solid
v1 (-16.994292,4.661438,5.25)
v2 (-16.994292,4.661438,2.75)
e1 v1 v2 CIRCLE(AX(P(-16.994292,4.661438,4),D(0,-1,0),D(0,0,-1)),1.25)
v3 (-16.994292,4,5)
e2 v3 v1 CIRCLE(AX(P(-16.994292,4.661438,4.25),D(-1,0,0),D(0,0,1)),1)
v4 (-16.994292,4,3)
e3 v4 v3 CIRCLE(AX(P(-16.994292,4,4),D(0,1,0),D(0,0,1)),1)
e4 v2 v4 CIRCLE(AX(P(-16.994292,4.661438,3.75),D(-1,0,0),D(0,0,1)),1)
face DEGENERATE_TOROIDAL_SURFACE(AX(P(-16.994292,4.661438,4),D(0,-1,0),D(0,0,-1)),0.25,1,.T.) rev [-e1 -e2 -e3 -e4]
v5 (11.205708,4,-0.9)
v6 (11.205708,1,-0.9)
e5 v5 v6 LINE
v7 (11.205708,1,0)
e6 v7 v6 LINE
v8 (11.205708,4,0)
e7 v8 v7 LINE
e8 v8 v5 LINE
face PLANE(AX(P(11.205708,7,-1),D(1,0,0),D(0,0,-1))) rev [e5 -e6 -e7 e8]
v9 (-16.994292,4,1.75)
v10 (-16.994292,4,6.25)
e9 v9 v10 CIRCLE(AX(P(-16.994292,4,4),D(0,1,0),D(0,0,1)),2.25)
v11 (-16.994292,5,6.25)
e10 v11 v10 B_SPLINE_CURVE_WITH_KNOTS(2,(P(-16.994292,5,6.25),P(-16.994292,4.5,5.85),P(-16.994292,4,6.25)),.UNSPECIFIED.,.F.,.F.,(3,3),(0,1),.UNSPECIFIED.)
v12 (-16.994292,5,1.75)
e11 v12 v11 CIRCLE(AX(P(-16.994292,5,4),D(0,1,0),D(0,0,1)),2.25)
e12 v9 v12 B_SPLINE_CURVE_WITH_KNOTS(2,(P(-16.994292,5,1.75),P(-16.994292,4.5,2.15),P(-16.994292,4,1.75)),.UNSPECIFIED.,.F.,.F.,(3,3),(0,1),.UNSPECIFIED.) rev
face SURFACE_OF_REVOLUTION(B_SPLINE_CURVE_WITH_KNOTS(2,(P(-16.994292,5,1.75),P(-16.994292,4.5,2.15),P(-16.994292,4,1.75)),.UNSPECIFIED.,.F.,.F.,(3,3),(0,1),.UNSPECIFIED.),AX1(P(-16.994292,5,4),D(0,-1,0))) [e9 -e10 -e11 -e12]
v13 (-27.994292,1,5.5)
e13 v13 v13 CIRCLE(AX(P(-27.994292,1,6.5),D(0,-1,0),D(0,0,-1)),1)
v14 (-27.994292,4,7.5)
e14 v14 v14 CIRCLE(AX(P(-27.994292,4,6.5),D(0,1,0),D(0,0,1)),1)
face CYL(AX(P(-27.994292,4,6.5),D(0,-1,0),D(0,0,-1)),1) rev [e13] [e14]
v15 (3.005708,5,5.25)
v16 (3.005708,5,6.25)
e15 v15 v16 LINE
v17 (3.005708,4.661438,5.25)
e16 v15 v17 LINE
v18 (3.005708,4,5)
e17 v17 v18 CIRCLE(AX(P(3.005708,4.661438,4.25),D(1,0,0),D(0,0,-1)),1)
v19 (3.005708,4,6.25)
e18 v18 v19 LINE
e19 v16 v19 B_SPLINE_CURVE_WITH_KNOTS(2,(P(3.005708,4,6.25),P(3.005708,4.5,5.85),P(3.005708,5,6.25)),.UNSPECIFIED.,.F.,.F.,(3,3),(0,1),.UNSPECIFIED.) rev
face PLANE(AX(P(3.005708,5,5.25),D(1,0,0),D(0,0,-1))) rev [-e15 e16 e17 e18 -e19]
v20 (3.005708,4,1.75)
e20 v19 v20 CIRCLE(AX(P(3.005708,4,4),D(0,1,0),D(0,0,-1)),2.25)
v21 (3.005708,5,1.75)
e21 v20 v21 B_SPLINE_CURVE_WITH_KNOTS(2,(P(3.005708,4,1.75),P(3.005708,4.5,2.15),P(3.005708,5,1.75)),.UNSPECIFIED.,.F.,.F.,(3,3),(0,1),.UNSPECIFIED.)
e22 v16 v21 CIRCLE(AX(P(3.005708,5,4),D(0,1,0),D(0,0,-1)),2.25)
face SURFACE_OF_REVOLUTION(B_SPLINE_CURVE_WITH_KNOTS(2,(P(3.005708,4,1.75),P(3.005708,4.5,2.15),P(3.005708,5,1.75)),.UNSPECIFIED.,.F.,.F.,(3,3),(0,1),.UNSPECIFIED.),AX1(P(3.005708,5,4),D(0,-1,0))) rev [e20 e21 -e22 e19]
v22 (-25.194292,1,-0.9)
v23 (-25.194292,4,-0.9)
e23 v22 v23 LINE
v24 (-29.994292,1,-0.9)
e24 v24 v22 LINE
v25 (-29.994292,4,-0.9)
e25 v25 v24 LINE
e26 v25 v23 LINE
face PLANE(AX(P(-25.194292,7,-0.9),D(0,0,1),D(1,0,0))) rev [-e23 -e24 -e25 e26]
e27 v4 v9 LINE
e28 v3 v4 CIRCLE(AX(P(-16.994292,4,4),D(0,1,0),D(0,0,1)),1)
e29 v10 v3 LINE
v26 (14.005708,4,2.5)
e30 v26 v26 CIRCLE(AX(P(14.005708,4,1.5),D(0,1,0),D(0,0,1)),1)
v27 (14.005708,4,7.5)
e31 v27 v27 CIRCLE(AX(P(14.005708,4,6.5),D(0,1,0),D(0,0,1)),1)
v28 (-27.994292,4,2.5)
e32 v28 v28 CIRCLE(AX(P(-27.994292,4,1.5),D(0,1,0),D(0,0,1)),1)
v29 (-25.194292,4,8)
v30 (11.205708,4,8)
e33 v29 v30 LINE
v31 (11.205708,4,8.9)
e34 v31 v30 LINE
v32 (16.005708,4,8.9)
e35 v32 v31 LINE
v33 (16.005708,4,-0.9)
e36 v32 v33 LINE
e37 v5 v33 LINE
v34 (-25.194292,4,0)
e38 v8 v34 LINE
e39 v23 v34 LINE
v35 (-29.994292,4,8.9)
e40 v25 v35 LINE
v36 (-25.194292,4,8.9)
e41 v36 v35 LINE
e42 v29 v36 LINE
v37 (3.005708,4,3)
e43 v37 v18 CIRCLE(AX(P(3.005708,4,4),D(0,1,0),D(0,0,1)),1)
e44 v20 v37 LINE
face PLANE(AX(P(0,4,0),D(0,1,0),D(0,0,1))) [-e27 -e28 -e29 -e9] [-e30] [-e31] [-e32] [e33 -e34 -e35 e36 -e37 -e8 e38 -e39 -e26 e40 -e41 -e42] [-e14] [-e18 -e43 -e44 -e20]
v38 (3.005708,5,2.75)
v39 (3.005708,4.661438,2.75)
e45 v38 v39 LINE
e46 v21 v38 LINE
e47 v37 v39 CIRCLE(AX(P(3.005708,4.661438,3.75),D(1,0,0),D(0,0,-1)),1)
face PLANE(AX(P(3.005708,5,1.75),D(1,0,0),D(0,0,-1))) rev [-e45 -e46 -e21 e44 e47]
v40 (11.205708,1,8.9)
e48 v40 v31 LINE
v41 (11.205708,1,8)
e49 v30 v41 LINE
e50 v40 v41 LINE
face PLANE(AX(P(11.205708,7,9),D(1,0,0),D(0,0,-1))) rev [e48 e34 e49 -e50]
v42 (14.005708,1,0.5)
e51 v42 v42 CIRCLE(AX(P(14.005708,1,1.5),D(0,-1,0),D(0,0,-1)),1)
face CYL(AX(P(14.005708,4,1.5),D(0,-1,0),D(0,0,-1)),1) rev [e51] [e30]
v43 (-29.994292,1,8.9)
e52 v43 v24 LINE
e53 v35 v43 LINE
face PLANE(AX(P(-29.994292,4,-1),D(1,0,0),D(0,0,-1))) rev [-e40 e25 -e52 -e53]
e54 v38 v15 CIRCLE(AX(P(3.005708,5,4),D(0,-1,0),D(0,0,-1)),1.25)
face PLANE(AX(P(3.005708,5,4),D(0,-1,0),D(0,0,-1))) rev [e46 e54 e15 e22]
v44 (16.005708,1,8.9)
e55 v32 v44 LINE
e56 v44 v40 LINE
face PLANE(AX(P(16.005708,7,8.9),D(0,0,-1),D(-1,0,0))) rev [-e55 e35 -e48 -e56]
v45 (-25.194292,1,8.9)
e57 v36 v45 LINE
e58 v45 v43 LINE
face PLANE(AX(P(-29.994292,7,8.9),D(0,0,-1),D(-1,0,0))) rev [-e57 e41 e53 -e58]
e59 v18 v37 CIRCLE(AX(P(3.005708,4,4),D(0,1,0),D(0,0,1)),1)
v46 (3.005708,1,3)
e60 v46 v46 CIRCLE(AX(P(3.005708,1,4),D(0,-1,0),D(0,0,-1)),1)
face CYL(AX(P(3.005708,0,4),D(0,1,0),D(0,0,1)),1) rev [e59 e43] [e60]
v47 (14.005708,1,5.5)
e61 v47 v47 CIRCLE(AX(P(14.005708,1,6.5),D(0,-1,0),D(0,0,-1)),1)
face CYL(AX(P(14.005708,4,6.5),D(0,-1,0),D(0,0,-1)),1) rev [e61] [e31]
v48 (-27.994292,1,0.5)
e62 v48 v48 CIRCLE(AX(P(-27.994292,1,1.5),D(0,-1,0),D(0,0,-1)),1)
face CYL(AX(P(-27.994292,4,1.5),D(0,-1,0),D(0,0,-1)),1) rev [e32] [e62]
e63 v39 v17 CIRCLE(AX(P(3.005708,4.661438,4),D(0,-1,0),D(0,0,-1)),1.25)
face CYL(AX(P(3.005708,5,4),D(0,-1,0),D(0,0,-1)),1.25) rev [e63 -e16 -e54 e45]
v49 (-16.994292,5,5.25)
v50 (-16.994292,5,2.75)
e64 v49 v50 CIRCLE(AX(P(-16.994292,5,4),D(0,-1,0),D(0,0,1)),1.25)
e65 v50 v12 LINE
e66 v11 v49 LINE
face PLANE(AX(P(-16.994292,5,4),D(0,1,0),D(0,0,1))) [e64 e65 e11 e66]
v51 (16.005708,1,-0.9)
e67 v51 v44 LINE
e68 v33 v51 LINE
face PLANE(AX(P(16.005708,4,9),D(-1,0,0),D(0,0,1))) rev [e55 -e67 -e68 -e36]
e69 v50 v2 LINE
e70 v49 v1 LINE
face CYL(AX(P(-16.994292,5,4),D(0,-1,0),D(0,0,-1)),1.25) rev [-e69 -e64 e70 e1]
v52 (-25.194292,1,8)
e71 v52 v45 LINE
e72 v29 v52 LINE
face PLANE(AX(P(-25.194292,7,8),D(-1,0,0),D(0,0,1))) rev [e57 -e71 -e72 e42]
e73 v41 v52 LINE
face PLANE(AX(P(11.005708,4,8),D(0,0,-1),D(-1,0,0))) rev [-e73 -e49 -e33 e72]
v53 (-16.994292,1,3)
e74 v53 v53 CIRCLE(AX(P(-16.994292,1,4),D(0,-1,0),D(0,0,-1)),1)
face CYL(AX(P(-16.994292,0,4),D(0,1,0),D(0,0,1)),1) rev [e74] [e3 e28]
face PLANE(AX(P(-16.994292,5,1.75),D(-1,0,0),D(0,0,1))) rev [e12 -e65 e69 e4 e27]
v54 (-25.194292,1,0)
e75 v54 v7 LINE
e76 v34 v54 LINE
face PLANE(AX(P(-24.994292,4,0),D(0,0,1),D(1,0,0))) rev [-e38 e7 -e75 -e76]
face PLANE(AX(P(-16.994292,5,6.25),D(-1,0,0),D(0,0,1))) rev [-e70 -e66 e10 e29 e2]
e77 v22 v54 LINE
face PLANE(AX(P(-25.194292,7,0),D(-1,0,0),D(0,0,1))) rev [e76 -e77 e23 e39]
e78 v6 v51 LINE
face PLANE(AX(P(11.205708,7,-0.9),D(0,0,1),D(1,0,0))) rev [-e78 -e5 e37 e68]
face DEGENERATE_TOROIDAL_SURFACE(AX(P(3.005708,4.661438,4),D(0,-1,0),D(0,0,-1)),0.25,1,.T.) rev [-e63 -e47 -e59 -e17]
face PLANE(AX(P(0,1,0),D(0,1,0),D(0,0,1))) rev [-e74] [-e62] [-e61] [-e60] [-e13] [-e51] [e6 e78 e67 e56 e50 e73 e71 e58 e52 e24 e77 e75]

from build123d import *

# Parameters (mm, degrees)
SKETCH_1_R          = 1
EXTRUDE_2_DEPTH     = 4
EXTRUDE_3_DEPTH     = 1
CUT_EXTRUDE_2_DEPTH = 1
SKETCH_10_R         = 25.399360379
CUT_EXTRUDE_3_DEPTH = 3
SKETCH_11_R         = 29.436090692
CUT_EXTRUDE_4_DEPTH = 10
EXTRUDE_4_DEPTH     = 1
SKETCH_17_W         = 0.2
SKETCH_17_H         = 1
CUT_EXTRUDE_6_DEPTH = 4
SKETCH_18_W         = 4.8
SKETCH_18_H         = 0.1
CUT_EXTRUDE_7_DEPTH = 4
SKETCH_19_R         = 1
CUT_EXTRUDE_8_DEPTH = 4
FILLET_1_R          = 1
FILLET_2_R          = 1
EXTRUDE_START       = 2
SKETCH_21_R         = 1
EXTRUDE_5_DEPTH     = 2


with BuildPart() as part:
    # 草图1 → 凸台-拉伸2 (new body)
    with BuildSketch(Plane(origin=(0, 0, 0), x_dir=(1, 0, 0), z_dir=(0, 1, 0))):
        Polygon((-24.994291736, 0), (11.005708264, 0), (11.005708264, 1), (16.005708264, 1), (16.005708264, -9), (11.005708264, -9), (11.005708264, -8), (-24.994291736, -8), (-24.994291736, -9), (-29.994291736, -9), (-29.994291736, 1), (-24.994291736, 1), align=None)
        with Locations(Location((-27.994291736, -6.5, 0), (0, 0, 270))):
            Circle(SKETCH_1_R, mode=Mode.SUBTRACT)
        with Locations(Location((-27.994291736, -1.5, 0), (0, 0, 270))):
            Circle(SKETCH_1_R, mode=Mode.SUBTRACT)
        with Locations(Location((14.005708264, -1.5, 0), (0, 0, 270))):
            Circle(SKETCH_1_R, mode=Mode.SUBTRACT)
        with Locations(Location((14.005708264, -6.5, 0), (0, 0, 270))):
            Circle(SKETCH_1_R, mode=Mode.SUBTRACT)
    extrude(amount=EXTRUDE_2_DEPTH)

    # 草图2 → 凸台-拉伸3 (add)
    with BuildSketch(Plane(origin=(0, 4, 0), x_dir=(1, 0, 0), z_dir=(0, 1, 0))):
        with BuildLine():
            Line((-14.894291736, -1.75), (0.905708264, -1.75))
            ThreePointArc((0.905708264, -1.75), (3.155708264, -4), (0.905708264, -6.25))
            Line((0.905708264, -6.25), (-14.894291736, -6.25))
            ThreePointArc((-14.894291736, -6.25), (-17.144291736, -4), (-14.894291736, -1.75))
        make_face()
    extrude(amount=EXTRUDE_3_DEPTH)

    # 草图3 → 切除-拉伸2 (cut)
    with BuildSketch(Plane(origin=(0, 5, 0), x_dir=(1, 0, 0), z_dir=(0, 1, 0))):
        with BuildLine():
            Line((-14.894291736, -2.5), (-14.894291736, -1.75))
            Line((-14.894291736, -1.75), (0.905708264, -1.75))
            Line((0.905708264, -1.75), (0.905708264, -2.5))
            ThreePointArc((0.905708264, -2.5), (2.405708264, -4), (0.905708264, -5.5))
            Line((0.905708264, -5.5), (0.905708264, -6.25))
            Line((0.905708264, -6.25), (-14.894291736, -6.25))
            Line((-14.894291736, -6.25), (-14.894291736, -5.5))
            ThreePointArc((-14.894291736, -5.5), (-16.394291736, -4), (-14.894291736, -2.5))
        make_face()
    extrude(amount=-CUT_EXTRUDE_2_DEPTH, mode=Mode.SUBTRACT)

    # 切除-扫描2: sweep along a path in 草图5
    with BuildLine(Plane(origin=(0, 5, 0), x_dir=(1, 0, 0), z_dir=(0, 1, 0))) as sweep_2_path:
        CenterArc((-14.894291736, -4), 2.25, 0, 360)
    # 草图4 → 切除-扫描2 (sweep, cut)
    with BuildSketch(Plane(origin=(-14.894291736, 0, 0), x_dir=(0, 0, -1), z_dir=(1, 0, 0))):
        with BuildLine():
            Line((-6.25, 5), (-6.25, 4))
            add(Edge.make_bspline(
                [(-6.25, 5), (-5.95, 4.5), (-6.25, 4)],
                knots=[0, 0, 0, 1, 1, 1], degree=2))
        make_face()
    sweep(path=sweep_2_path.line, mode=Mode.SUBTRACT)

    # 切除-扫描3: sweep along a path in 草图9
    with BuildLine(Plane(origin=(0, 5, 0), x_dir=(1, 0, 0), z_dir=(0, 1, 0))) as sweep_3_path:
        CenterArc((0.905708264, -4), 2.25, 0, 360)
    # 草图8 → 切除-扫描3 (sweep, cut)
    with BuildSketch(Plane.ZY.offset(-0.905708264)):
        with BuildLine():
            Line((6.25, 4), (6.25, 5))
            add(Edge.make_bspline(
                [(6.25, 4), (5.95, 4.5), (6.25, 5)],
                knots=[0, 0, 0, 1, 1, 1], degree=2))
        make_face()
    sweep(path=sweep_3_path.line, mode=Mode.SUBTRACT)

    # 草图10 → 切除-拉伸3 (cut)
    with BuildSketch(Plane.XZ):
        with Locations((-6.994291736, 4.240455063)):
            Circle(SKETCH_10_R)
    extrude(amount=-CUT_EXTRUDE_3_DEPTH, mode=Mode.SUBTRACT)

    # 草图11 → 切除-拉伸4 (cut)
    with BuildSketch(Plane(origin=(0, 4, 0), x_dir=(1, 0, 0), z_dir=(0, 1, 0))):
        with Locations((-7.872659643, -3.561647991)):
            Circle(SKETCH_11_R)
    extrude(amount=CUT_EXTRUDE_4_DEPTH, mode=Mode.SUBTRACT)

    # 草图12 → 凸台-拉伸4 (add)
    with BuildSketch(Plane(origin=(0, 4, 0), x_dir=(1, 0, 0), z_dir=(0, 1, 0))):
        with BuildLine():
            Line((-16.994291736, -1.75), (-16.994291736, -2.75))
            ThreePointArc((-16.994291736, -2.75), (-18.244291736, -4), (-16.994291736, -5.25))
            Line((-16.994291736, -5.25), (-16.994291736, -6.25))
            ThreePointArc((-16.994291736, -6.25), (-19.244291736, -4), (-16.994291736, -1.75))
        make_face()
        with BuildLine():
            Line((3.005708264, -1.75), (3.005708264, -2.75))
            ThreePointArc((3.005708264, -2.75), (4.255708264, -4), (3.005708264, -5.25))
            Line((3.005708264, -5.25), (3.005708264, -6.25))
            ThreePointArc((3.005708264, -6.25), (5.255708264, -4), (3.005708264, -1.75))
        make_face()
    extrude(amount=EXTRUDE_4_DEPTH)

    # 切除-扫描4: sweep along a path in 草图14
    with BuildLine(Plane(origin=(0, 5, 0), x_dir=(1, 0, 0), z_dir=(0, 1, 0))) as sweep_4_path:
        CenterArc((-16.994291736, -4), 2.25, 0, 360)
    # 草图13 → 切除-扫描4 (sweep, cut)
    with BuildSketch(Plane(origin=(-16.994291736, 0, 0), x_dir=(0, 0, -1), z_dir=(1, 0, 0))):
        with BuildLine():
            Line((-1.75, 5), (-1.75, 4))
            add(Edge.make_bspline(
                [(-1.75, 5), (-2.15, 4.5), (-1.75, 4)],
                knots=[0, 0, 0, 1, 1, 1], degree=2))
        make_face()
    sweep(path=sweep_4_path.line, mode=Mode.SUBTRACT)

    # 切除-扫描5: sweep along a path in 草图16
    with BuildLine(Plane(origin=(0, 5, 0), x_dir=(1, 0, 0), z_dir=(0, 1, 0))) as sweep_5_path:
        CenterArc((3.005708264, -4), 2.25, 0, 360)
    # 草图15 → 切除-扫描5 (sweep, cut)
    with BuildSketch(Plane.ZY.offset(-3.005708264)):
        with BuildLine():
            Line((1.75, 5), (1.75, 4))
            add(Edge.make_bspline(
                [(1.75, 5), (2.15, 4.5), (1.75, 4)],
                knots=[0, 0, 0, 1, 1, 1], degree=2))
        make_face()
    sweep(path=sweep_5_path.line, mode=Mode.SUBTRACT)

    # 草图17 → 切除-拉伸6 (cut)
    with BuildSketch(Plane.XZ.offset(-3)):
        with Locations((-25.094291736, 8.5)):
            Rectangle(SKETCH_17_W, SKETCH_17_H)
        with Locations((-25.094291736, -0.5)):
            Rectangle(SKETCH_17_W, SKETCH_17_H)
        with Locations((11.105708264, 8.5)):
            Rectangle(SKETCH_17_W, SKETCH_17_H)
        with Locations((11.105708264, -0.5)):
            Rectangle(SKETCH_17_W, SKETCH_17_H)
    extrude(amount=-CUT_EXTRUDE_6_DEPTH, mode=Mode.SUBTRACT)

    # 草图18 → 切除-拉伸7 (cut)
    with BuildSketch(Plane.XZ.offset(-3)):
        with Locations((13.605708264, 8.95)):
            Rectangle(SKETCH_18_W, SKETCH_18_H)
        with Locations((13.605708264, -0.95)):
            Rectangle(SKETCH_18_W, SKETCH_18_H)
        with Locations((-27.594291736, 8.95)):
            Rectangle(SKETCH_18_W, SKETCH_18_H)
        with Locations((-27.594291736, -0.95)):
            Rectangle(SKETCH_18_W, SKETCH_18_H)
    extrude(amount=-CUT_EXTRUDE_7_DEPTH, mode=Mode.SUBTRACT)

    # 草图19 → 切除-拉伸8 (cut)
    with BuildSketch(Plane(origin=(0, 4, 0), x_dir=(1, 0, 0), z_dir=(0, 1, 0))):
        with Locations(Location((3.005708264, -4, 0), (0, 0, 270))):
            Circle(SKETCH_19_R)
        with Locations(Location((-16.994291736, -4, 0), (0, 0, 270))):
            Circle(SKETCH_19_R)
    extrude(amount=-CUT_EXTRUDE_8_DEPTH, mode=Mode.SUBTRACT)

    # 圆角1
    # the kernel refuses this fillet: 1 mm, written as the material it adds along each edge
    with BuildSketch(Plane(origin=(-16.994291736, 4, 4), x_dir=(0, 0, -1), z_dir=(1, 0, 0))) as fillet_1_piece_1:
        with BuildLine():
            CenterArc((0.25, 0.661437828), FILLET_1_R, 318.590377891, 41.409622109)
            Line((1.25, 0.661437828), (1.27, 0.661437828))
            Line((1.27, 0.661437828), (1.27, 0))
            Line((1.27, 0), (1.25, -0.02))
            ThreePointArc((1.25, -0.02), (1.125, -0.02), (1.015, -0.013228757))
            Line((1.015, -0.013228757), (1, 0))
        make_face()
    revolve(axis=Axis((-16.994291736, 4, 4), (0, 1, 0)), revolution_arc=180)

    # 圆角2
    # the kernel refuses this fillet: 1 mm, written as the material it adds along each edge
    with BuildSketch(Plane(origin=(3.005708264, 4, 4), x_dir=(0, 0, -1), z_dir=(-1, 0, 0))) as fillet_2_piece_1:
        with BuildLine():
            CenterArc((0.25, -0.661437828), FILLET_2_R, 0, 41.409622109)
            Line((1.25, -0.661437828), (1.27, -0.661437828))
            Line((1.27, -0.661437828), (1.27, 0))
            Line((1.27, 0), (1.25, 0.02))
            ThreePointArc((1.25, 0.02), (1.125, 0.02), (1.015, 0.013228757))
            Line((1.015, 0.013228757), (1, 0))
        make_face()
    revolve(axis=Axis((3.005708264, 4, 4), (0, -1, 0)), revolution_arc=180)

    # 草图21 → 凸台-拉伸5 (add)
    with BuildSketch(Plane.XZ.offset(-3).offset(EXTRUDE_START)):
        Polygon((-29.994291736, 8.9), (-25.194291736, 8.9), (-25.194291736, 8), (11.205708264, 8), (11.205708264, 8.9), (16.005708264, 8.9), (16.005708264, -0.9), (11.205708264, -0.9), (11.205708264, 0), (-25.194291736, 0), (-25.194291736, -0.9), (-29.994291736, -0.9), align=None)
        with Locations(Location((-27.994291736, 6.5, 0), (0, 0, 270))):
            Circle(SKETCH_21_R, mode=Mode.SUBTRACT)
        with Locations(Location((-27.994291736, 1.5, 0), (0, 0, 270))):
            Circle(SKETCH_21_R, mode=Mode.SUBTRACT)
        with Locations(Location((-16.994291736, 4, 0), (0, 0, 270))):
            Circle(SKETCH_21_R, mode=Mode.SUBTRACT)
        with Locations(Location((3.005708264, 4, 0), (0, 0, 270))):
            Circle(SKETCH_21_R, mode=Mode.SUBTRACT)
        with Locations(Location((14.005708264, 6.5, 0), (0, 0, 270))):
            Circle(SKETCH_21_R, mode=Mode.SUBTRACT)
        with Locations(Location((14.005708264, 1.5, 0), (0, 0, 270))):
            Circle(SKETCH_21_R, mode=Mode.SUBTRACT)
    extrude(amount=-EXTRUDE_5_DEPTH)


solid = part.part
